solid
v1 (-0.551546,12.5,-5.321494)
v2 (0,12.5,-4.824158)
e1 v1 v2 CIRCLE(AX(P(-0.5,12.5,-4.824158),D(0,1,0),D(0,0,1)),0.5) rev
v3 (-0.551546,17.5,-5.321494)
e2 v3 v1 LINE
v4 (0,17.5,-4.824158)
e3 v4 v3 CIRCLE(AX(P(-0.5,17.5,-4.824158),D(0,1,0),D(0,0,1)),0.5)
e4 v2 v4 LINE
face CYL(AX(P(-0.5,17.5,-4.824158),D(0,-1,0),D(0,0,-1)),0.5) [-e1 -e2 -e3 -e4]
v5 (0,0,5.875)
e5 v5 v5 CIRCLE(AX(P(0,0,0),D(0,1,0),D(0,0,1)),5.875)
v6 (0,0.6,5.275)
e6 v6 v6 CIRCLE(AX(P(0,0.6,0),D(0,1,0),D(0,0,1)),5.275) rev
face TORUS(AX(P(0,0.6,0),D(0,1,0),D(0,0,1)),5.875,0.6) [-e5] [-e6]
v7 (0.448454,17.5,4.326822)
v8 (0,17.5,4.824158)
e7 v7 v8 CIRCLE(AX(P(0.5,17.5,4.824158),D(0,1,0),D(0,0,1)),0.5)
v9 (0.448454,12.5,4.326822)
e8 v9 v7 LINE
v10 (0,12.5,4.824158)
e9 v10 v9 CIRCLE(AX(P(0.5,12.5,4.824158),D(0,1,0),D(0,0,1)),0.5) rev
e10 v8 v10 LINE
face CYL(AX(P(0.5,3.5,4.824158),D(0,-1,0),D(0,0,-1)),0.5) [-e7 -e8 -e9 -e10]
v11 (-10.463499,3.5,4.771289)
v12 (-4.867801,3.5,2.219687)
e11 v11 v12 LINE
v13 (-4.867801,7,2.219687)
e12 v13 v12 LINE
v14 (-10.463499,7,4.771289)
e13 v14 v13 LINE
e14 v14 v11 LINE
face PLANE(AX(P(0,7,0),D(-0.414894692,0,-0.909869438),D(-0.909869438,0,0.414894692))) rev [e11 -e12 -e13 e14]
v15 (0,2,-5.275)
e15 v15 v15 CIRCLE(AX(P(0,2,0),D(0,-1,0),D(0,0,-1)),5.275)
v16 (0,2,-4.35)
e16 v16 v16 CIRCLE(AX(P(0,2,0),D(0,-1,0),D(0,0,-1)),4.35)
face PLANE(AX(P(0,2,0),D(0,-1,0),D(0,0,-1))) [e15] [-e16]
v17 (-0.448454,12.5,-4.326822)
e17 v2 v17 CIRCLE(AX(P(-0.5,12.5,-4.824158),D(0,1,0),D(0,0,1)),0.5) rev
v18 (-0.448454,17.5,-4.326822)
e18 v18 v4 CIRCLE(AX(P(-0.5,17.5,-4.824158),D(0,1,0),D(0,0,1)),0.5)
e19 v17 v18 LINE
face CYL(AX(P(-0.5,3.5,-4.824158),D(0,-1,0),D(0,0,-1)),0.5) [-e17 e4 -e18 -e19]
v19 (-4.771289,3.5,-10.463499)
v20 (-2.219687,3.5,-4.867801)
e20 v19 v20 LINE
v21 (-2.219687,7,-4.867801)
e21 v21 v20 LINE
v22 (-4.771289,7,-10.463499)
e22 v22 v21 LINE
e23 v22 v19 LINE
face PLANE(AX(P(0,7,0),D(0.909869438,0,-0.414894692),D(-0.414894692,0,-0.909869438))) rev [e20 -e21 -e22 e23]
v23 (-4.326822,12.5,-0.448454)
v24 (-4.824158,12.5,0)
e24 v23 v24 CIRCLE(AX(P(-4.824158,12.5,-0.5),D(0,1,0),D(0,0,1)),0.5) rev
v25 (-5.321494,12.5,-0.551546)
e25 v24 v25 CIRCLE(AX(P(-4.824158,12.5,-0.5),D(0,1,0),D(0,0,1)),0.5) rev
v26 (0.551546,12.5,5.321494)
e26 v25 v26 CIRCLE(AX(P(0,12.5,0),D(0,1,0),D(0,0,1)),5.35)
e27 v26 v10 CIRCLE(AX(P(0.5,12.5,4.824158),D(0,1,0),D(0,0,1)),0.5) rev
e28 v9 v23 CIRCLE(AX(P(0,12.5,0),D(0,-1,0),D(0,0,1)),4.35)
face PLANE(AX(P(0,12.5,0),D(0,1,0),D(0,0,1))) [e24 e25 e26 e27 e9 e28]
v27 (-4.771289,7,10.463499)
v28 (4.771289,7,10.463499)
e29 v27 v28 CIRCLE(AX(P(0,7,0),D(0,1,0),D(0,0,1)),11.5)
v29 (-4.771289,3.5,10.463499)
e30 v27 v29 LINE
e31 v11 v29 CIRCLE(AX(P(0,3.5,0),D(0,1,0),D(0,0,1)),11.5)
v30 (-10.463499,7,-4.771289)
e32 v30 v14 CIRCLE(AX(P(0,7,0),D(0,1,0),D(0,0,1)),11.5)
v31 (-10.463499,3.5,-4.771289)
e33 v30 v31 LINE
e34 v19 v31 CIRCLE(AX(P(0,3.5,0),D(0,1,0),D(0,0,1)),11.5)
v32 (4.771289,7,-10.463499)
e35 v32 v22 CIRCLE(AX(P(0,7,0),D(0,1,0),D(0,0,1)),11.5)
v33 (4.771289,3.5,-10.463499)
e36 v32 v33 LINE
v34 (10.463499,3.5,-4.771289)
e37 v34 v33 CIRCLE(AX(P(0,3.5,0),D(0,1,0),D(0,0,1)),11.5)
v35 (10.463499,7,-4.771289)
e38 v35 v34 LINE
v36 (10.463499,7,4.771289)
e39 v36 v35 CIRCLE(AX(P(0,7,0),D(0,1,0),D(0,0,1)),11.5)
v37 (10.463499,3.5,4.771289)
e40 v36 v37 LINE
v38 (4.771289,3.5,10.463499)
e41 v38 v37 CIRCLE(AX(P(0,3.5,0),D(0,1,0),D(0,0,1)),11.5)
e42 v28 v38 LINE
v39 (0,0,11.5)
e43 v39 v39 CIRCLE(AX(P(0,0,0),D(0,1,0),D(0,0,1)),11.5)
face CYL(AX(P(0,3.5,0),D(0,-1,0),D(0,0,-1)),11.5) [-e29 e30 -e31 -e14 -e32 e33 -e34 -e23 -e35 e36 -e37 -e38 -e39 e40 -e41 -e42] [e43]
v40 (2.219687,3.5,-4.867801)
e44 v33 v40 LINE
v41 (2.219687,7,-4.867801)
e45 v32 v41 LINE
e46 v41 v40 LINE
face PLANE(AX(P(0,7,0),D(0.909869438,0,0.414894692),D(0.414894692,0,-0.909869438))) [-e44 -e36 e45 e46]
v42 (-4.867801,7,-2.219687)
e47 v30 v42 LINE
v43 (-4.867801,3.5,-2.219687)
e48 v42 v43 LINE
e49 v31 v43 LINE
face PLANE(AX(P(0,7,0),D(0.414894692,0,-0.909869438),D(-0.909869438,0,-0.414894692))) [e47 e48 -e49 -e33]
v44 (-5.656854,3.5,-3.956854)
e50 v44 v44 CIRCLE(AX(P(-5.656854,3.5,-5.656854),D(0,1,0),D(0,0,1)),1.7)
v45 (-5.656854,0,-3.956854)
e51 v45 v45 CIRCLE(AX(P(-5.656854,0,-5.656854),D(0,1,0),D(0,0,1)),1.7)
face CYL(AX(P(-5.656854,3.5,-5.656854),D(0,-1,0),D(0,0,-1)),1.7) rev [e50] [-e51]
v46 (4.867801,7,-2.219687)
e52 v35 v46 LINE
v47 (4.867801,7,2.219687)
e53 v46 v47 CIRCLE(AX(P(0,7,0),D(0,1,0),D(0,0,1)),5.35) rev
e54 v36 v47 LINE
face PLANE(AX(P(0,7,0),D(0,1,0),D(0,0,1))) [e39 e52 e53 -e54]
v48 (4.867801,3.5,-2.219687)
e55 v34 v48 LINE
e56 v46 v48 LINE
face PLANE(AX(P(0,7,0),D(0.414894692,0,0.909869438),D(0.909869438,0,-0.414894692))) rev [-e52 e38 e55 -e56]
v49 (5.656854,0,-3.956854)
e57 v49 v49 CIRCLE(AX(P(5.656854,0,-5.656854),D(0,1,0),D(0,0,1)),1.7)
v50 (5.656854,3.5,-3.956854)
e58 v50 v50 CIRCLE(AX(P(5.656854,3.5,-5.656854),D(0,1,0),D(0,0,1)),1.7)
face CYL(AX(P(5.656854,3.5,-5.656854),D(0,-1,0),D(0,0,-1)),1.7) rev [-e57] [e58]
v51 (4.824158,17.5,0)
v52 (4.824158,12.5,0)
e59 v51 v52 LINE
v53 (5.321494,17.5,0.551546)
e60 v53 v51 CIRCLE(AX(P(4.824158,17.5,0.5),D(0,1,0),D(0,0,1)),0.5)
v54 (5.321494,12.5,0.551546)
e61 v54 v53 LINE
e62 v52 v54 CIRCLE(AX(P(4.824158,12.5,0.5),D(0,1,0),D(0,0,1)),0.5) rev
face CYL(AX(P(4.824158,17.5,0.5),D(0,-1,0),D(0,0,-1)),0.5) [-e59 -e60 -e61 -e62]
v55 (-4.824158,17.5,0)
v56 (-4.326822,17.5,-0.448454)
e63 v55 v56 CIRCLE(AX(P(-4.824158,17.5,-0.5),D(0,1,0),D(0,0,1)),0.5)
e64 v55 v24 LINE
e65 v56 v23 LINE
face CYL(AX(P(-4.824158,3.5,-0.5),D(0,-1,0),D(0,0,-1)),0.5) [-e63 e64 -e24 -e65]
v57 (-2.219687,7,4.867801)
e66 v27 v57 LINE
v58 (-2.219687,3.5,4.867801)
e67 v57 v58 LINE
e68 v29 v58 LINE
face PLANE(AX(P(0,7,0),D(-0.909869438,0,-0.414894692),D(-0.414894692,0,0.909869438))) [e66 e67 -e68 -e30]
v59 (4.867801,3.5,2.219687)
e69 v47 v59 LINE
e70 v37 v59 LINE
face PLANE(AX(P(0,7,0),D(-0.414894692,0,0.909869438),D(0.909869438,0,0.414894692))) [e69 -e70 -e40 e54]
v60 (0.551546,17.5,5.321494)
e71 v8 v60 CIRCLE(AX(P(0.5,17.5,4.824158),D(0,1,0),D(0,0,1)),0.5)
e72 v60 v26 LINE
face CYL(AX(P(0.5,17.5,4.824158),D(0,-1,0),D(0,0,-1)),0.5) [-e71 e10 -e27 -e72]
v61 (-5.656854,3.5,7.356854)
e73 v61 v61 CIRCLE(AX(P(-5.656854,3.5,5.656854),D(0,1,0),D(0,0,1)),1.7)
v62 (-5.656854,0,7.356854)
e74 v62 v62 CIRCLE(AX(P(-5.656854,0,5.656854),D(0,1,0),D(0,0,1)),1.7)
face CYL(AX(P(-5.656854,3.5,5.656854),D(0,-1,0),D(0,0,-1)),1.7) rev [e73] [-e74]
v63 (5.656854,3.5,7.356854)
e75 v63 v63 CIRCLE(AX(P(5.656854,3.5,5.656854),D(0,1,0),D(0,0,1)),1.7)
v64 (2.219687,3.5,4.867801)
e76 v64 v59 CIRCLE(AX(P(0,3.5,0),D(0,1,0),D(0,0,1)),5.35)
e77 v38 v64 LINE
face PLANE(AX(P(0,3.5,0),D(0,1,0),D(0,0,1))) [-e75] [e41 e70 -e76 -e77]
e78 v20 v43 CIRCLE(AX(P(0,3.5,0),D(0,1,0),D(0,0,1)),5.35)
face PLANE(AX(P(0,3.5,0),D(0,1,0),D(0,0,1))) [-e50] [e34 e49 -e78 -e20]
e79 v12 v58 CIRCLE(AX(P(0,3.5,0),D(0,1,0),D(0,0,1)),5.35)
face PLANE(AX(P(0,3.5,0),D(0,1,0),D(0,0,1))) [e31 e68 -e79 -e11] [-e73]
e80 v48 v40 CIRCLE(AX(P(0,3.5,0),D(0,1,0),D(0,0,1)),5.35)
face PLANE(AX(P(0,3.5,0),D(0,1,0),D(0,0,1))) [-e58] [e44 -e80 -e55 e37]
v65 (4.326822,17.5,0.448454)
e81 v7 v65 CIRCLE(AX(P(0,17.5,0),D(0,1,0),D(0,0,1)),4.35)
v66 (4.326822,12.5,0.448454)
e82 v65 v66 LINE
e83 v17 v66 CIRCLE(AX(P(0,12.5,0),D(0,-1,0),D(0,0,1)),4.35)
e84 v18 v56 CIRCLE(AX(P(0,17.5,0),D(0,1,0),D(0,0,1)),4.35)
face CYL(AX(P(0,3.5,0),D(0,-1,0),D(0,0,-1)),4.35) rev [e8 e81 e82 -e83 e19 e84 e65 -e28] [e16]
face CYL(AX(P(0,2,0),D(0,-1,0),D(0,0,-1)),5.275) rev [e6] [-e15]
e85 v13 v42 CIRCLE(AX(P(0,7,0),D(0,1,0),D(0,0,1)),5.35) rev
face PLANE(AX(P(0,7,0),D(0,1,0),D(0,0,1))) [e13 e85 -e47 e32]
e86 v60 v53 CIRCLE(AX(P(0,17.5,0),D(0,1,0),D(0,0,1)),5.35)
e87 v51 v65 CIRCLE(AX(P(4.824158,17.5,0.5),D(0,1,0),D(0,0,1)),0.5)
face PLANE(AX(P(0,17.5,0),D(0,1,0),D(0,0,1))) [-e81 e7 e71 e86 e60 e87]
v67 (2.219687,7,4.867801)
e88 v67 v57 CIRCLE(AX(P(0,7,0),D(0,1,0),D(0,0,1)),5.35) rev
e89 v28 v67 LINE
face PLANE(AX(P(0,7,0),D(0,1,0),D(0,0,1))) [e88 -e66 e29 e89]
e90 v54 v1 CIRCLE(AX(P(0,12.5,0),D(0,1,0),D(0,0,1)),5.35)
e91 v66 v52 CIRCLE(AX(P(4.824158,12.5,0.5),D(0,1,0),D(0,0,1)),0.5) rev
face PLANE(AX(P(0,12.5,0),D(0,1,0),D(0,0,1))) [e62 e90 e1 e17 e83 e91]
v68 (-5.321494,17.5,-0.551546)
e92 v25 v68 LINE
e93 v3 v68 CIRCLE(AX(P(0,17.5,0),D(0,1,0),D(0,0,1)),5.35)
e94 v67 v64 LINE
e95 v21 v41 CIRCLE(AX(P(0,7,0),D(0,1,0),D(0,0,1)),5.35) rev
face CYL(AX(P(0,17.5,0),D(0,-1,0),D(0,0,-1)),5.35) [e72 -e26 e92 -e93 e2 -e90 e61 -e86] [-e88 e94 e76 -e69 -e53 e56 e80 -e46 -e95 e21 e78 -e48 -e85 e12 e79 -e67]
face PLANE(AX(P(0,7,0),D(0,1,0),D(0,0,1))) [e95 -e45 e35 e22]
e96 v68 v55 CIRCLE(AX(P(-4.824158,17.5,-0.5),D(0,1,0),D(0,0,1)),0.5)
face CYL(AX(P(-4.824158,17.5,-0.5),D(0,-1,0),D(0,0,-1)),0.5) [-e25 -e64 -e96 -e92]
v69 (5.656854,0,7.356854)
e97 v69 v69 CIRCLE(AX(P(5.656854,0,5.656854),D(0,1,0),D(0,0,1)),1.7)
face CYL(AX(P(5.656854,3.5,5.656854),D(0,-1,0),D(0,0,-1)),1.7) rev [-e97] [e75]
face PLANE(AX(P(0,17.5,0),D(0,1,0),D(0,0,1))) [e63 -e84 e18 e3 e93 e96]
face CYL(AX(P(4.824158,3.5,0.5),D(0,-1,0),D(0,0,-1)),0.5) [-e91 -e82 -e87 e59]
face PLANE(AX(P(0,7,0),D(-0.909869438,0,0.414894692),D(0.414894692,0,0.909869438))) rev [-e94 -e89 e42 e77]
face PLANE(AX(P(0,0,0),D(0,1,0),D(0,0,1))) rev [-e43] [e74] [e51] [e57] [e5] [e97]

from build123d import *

# Parameters (mm, degrees)
CROQUIS1_R              = 11.5
CROQUIS1_R_2            = 4.35
CROQUIS1_R_3            = 1.7000000000000004
SALIENTE_EXTRUIR1_DEPTH = 3.5
CROQUIS2_R              = 5.35
CROQUIS2_R_2            = 4.35
SALIENTE_EXTRUIR2_DEPTH = 14
CORTAR_EXTRUIR1_START   = -5
CORTAR_EXTRUIR1_DEPTH   = 5
CROQUIS4_R              = 5.275
CROQUIS4_R_2            = 4.35
CORTAR_EXTRUIR2_DEPTH   = 2
REDONDEO1_R             = 0.6
REDONDEO2_R             = 0.5
SALIENTE_EXTRUIR3_DEPTH = 3.5


with BuildPart() as part:
    # Croquis1 → Saliente-Extruir1 (new body)
    with BuildSketch(Plane(origin=(0, 0, 0), x_dir=(1, 0, 0), z_dir=(0, 1, 0))):
        with Locations(Location((1.731948e-11, 0, 0), (0, 0, 270))):
            Circle(CROQUIS1_R)
        with Locations(Location((1.731948e-11, 0, 0), (0, 0, 270))):
            Circle(CROQUIS1_R_2, mode=Mode.SUBTRACT)
        with Locations(Location((5.656854249492441, 5.65685424949238, 0), (0, 0, 270))):
            Circle(CROQUIS1_R_3, mode=Mode.SUBTRACT)
        with Locations(Location((-5.656854249492318, 5.656854249492381, 0), (0, 0, 270))):
            Circle(CROQUIS1_R_3, mode=Mode.SUBTRACT)
        with Locations(Location((-5.656854249492318, -5.656854249492381, 0), (0, 0, 270))):
            Circle(CROQUIS1_R_3, mode=Mode.SUBTRACT)
        with Locations(Location((5.656854249492441, -5.65685424949238, 0), (0, 0, 270))):
            Circle(CROQUIS1_R_3, mode=Mode.SUBTRACT)
    extrude(amount=SALIENTE_EXTRUIR1_DEPTH)

    # Croquis2 → Saliente-Extruir2 (add)
    with BuildSketch(Plane(origin=(0, 3.5, 0), x_dir=(1, 0, 0), z_dir=(0, 1, 0))):
        with Locations(Location((1.731948e-11, 0, 0), (0, 0, 270))):
            Circle(CROQUIS2_R)
        with Locations(Location((1.731948e-11, 0, 0), (0, 0, 270))):
            Circle(CROQUIS2_R_2, mode=Mode.SUBTRACT)
    extrude(amount=SALIENTE_EXTRUIR2_DEPTH)

    # Croquis3 → Cortar-Extruir1 (cut)
    with BuildSketch(Plane(origin=(0, 17.5, 0), x_dir=(1, 0, 0), z_dir=(0, 1, 0)).offset(CORTAR_EXTRUIR1_START)):
        with BuildLine():
            Line((1.732086e-11, 5.35), (1.732072e-11, 4.35))
            ThreePointArc((1.732072e-11, 4.35), (3.0759144981543076, 3.0759144981369877), (4.34999999998268, 0))
            Line((4.34999999998268, 0), (5.34999999998268, 0))
            ThreePointArc((5.34999999998268, 0), (3.783021279340855, 3.783021279323535), (1.732086e-11, 5.35))
        make_face()
        with BuildLine():
            Line((1.732086e-11, -5.35), (1.732072e-11, -4.35))
            ThreePointArc((1.732072e-11, -4.35), (-3.075914498144163, -3.075914498161481), (-4.34999999998268, 0))
            Line((-4.34999999998268, 0), (-5.34999999998268, 0))
            ThreePointArc((-5.34999999998268, 0), (-3.7830212793307103, -3.7830212793480285), (1.732086e-11, -5.35))
        make_face()
    extrude(amount=CORTAR_EXTRUIR1_DEPTH, mode=Mode.SUBTRACT)

    # Croquis4 → Cortar-Extruir2 (cut)
    with BuildSketch(Plane.XZ):
        with Locations(Location((1.731948e-11, 0, 0), (0, 0, 270))):
            Circle(CROQUIS4_R)
        with Locations(Location((1.731948e-11, 0, 0), (0, 0, 270))):
            Circle(CROQUIS4_R_2, mode=Mode.SUBTRACT)
    extrude(amount=-CORTAR_EXTRUIR2_DEPTH, mode=Mode.SUBTRACT)

    # Redondeo1
    redondeo1_edges = [part.edges().sort_by_distance(p)[0] for p in [
        (1.732109e-11, 0, 5.275),
    ]]
    fillet(redondeo1_edges, radius=REDONDEO1_R)

    # Redondeo2
    # the kernel refuses this fillet: 0.5 mm, written as the material it takes off along each edge
    with BuildSketch(Plane(origin=(-4.34999999998268, 12.5, -2.1e-16), x_dir=(0.05161519234821224, 0, -0.9986670475783493), z_dir=(0, 1, 0))) as redondeo2_piece_1:
        with BuildLine():
            CenterArc((0.4748597696035476, 0.49933352378917434), REDONDEO2_R, 182.9586473758917, 84.08270524821648)
            Line((-0.02447375418562714, 0.4735259276150691), (0, 0))
            ThreePointArc((0, 0), (0.22452608671472166, 0.00579834303418057), (0.44905217342944187, 0))
        make_face()
    extrude(amount=6.185394894032285, mode=Mode.SUBTRACT)
    with BuildSketch(Plane(origin=(-5.34999999998268, 12.5, 0), x_dir=(1, 0, 0), z_dir=(0, 1, 0))) as redondeo2_piece_2:
        with BuildLine():
            CenterArc((0.5258420423870858, 0.5), REDONDEO2_R, 174.08270524821654, 95.91729475178346)
            ThreePointArc((0.02850617046822812, 0.5515463917525764), (0.00713129545583069, 0.27614127906293384), (0, 0))
            Line((0, 0), (0.5258420423870858, 0))
        make_face()
    extrude(amount=6.3807063953146645, mode=Mode.SUBTRACT)
    with BuildSketch(Plane(origin=(1.73185e-11, 12.5, 5.35), x_dir=(4.4e-15, 0, -1), z_dir=(0, 1, 0))) as redondeo2_piece_3:
        with BuildLine():
            CenterArc((0.5258420423870889, -0.5), REDONDEO2_R, 90.00000000000026, 95.91729475178363)
            ThreePointArc((0.02850617046823233, -0.5515463917525796), (0.0071312954558319, -0.27614127906293445), (0, 0))
            Line((0, 0), (0.5258420423870867, 0))
        make_face()
    extrude(amount=6.380706395314672, mode=Mode.SUBTRACT)
    with BuildSketch(Plane(origin=(1.731868e-11, 12.5, 4.35), x_dir=(0.9986670475783493, 0, -0.051615192348211894), z_dir=(0, 1, 0))) as redondeo2_piece_4:
        with BuildLine():
            CenterArc((0.474859769603551, -0.49933352378917434), REDONDEO2_R, 92.95864737589183, 84.08270524821639)
            Line((-0.0244737541856237, -0.4735259276150684), (0, 0))
            ThreePointArc((0, 0), (0.2245260867147224, -0.00579834303418053), (0.4490521734294448, 0))
        make_face()
    extrude(amount=6.185394894032285, mode=Mode.SUBTRACT)
    with BuildSketch(Plane(origin=(1.732072e-11, 12.5, -4.35), x_dir=(-0.9986670475783493, 0, 0.05161519234821218), z_dir=(0, 1, 0))) as redondeo2_piece_5:
        with BuildLine():
            CenterArc((0.474859769603548, -0.49933352378917434), REDONDEO2_R, 92.95864737589177, 84.08270524821641)
            Line((-0.02447375418562666, -0.47352592761506823), (0, 0))
            ThreePointArc((0, 0), (0.22452608671472019, -0.00579834303418048), (0.4490521734294423, 0))
        make_face()
    extrude(amount=6.185394894032285, mode=Mode.SUBTRACT)
    with BuildSketch(Plane(origin=(1.732103e-11, 12.5, -5.35), x_dir=(-4.2e-16, 0, 1), z_dir=(0, 1, 0))) as redondeo2_piece_6:
        with BuildLine():
            CenterArc((0.525842042387086, -0.5), REDONDEO2_R, 90.00000000000003, 95.91729475178352)
            ThreePointArc((0.02850617046822835, -0.5515463917525767), (0.00713129545583081, -0.27614127906293173), (0, 0))
            Line((0, 0), (0.5258420423870858, 0))
        make_face()
    extrude(amount=6.3807063953146645, mode=Mode.SUBTRACT)
    with BuildSketch(Plane(origin=(4.34999999998268, 12.5, 1.9e-16), x_dir=(-0.05161519227127975, 0, 0.9986670475823255), z_dir=(0, 1, 0))) as redondeo2_piece_7:
        with BuildLine():
            CenterArc((0.47485976964022647, 0.4993335237871862), REDONDEO2_R, 182.95864737147792, 84.08270524821648)
            Line((-0.02447375415093636, 0.4735259276515472), (0, 0))
            ThreePointArc((0, 0), (0.22452608671427532, 0.00579834305147695), (0.44905217342765447, 0))
        make_face()
    extrude(amount=6.1853948941188825, mode=Mode.SUBTRACT)
    with BuildSketch(Plane(origin=(5.34999999998268, 12.5, 0), x_dir=(-1, 0, 0), z_dir=(0, 1, 0))) as redondeo2_piece_8:
        with BuildLine():
            CenterArc((0.5258420423524468, 0.5), REDONDEO2_R, 174.08270524821646, 95.91729475178352)
            ThreePointArc((0.02850617043359005, 0.5515463917525769), (0.0071312954212388, 0.2761412790638265), (0, 0))
            Line((0, 0), (0.5258420423524468, 0))
        make_face()
    extrude(amount=6.380706395310195, mode=Mode.SUBTRACT)

    # Croquis5 → Saliente-Extruir3 (add)
    with BuildSketch(Plane(origin=(0, 3.5, 0), x_dir=(1, 0, 0), z_dir=(0, 1, 0))):
        with BuildLine():
            Line((-4.867801495370659, 2.219686599837588), (-10.46349854147086, 4.7712889529219185))
            ThreePointArc((-10.46349854147086, 4.7712889529219185), (-11.49999999998268, 1.41e-15), (-10.46349854147086, -4.771288952921916))
            Line((-10.46349854147086, -4.771288952921914), (-4.86780149537066, -2.219686599837586))
            ThreePointArc((-4.86780149537066, -2.219686599837586), (-5.34999999998268, 8.9e-16), (-4.86780149537066, 2.219686599837588))
        make_face()
        with BuildLine():
            Line((-2.2196865998351183, -4.867801495381207), (-4.77128895293652, -10.463498541473625))
            ThreePointArc((-4.771288952936522, -10.463498541473623), (-6.77758e-12, -11.5), (4.771288952927311, -10.463498541493617))
            Line((4.771288952927309, -10.46349854149362), (2.2196865998493576, -4.86780149539051))
            ThreePointArc((2.219686599849358, -4.867801495390509), (6.10956e-12, -5.35), (-2.219686599835118, -4.867801495381206))
        make_face()
        with BuildLine():
            ThreePointArc((11.50000000001732, 0), (11.237887551221265, 2.4412872396535783), (10.463498541496383, 4.771288952941911))
            Line((10.463498541496381, 4.7712889529419105), (4.867801495401058, 2.2196865998468893))
            ThreePointArc((4.867801495401059, 2.2196865998468898), (5.228060730360026, 1.1357292810562294), (5.350000000017321, -1.1e-16))
            ThreePointArc((5.350000000017321, -1.1e-16), (5.228060730360026, -1.1357292810562303), (4.867801495401057, -2.2196865998468898))
            Line((4.867801495401058, -2.2196865998468898), (10.463498541496381, -4.771288952941912))
            ThreePointArc((10.463498541496378, -4.7712889529419185), (11.237887551221265, -2.4412872396535787), (11.50000000001732, -2.82e-15))
        make_face()
        with BuildLine():
            ThreePointArc((4.771288952927309, 10.46349854149362), (-6.77732e-12, 11.5), (-4.771288952936519, 10.463498541473625))
            Line((-4.771288952936519, 10.463498541473623), (-2.2196865998351187, 4.867801495381207))
            ThreePointArc((-2.219686599835118, 4.867801495381207), (6.10867e-12, 5.35), (2.219686599849357, 4.86780149539051))
            Line((2.2196865998493576, 4.86780149539051), (4.771288952927309, 10.46349854149362))
        make_face()
    extrude(amount=SALIENTE_EXTRUIR3_DEPTH)


solid = part.part
